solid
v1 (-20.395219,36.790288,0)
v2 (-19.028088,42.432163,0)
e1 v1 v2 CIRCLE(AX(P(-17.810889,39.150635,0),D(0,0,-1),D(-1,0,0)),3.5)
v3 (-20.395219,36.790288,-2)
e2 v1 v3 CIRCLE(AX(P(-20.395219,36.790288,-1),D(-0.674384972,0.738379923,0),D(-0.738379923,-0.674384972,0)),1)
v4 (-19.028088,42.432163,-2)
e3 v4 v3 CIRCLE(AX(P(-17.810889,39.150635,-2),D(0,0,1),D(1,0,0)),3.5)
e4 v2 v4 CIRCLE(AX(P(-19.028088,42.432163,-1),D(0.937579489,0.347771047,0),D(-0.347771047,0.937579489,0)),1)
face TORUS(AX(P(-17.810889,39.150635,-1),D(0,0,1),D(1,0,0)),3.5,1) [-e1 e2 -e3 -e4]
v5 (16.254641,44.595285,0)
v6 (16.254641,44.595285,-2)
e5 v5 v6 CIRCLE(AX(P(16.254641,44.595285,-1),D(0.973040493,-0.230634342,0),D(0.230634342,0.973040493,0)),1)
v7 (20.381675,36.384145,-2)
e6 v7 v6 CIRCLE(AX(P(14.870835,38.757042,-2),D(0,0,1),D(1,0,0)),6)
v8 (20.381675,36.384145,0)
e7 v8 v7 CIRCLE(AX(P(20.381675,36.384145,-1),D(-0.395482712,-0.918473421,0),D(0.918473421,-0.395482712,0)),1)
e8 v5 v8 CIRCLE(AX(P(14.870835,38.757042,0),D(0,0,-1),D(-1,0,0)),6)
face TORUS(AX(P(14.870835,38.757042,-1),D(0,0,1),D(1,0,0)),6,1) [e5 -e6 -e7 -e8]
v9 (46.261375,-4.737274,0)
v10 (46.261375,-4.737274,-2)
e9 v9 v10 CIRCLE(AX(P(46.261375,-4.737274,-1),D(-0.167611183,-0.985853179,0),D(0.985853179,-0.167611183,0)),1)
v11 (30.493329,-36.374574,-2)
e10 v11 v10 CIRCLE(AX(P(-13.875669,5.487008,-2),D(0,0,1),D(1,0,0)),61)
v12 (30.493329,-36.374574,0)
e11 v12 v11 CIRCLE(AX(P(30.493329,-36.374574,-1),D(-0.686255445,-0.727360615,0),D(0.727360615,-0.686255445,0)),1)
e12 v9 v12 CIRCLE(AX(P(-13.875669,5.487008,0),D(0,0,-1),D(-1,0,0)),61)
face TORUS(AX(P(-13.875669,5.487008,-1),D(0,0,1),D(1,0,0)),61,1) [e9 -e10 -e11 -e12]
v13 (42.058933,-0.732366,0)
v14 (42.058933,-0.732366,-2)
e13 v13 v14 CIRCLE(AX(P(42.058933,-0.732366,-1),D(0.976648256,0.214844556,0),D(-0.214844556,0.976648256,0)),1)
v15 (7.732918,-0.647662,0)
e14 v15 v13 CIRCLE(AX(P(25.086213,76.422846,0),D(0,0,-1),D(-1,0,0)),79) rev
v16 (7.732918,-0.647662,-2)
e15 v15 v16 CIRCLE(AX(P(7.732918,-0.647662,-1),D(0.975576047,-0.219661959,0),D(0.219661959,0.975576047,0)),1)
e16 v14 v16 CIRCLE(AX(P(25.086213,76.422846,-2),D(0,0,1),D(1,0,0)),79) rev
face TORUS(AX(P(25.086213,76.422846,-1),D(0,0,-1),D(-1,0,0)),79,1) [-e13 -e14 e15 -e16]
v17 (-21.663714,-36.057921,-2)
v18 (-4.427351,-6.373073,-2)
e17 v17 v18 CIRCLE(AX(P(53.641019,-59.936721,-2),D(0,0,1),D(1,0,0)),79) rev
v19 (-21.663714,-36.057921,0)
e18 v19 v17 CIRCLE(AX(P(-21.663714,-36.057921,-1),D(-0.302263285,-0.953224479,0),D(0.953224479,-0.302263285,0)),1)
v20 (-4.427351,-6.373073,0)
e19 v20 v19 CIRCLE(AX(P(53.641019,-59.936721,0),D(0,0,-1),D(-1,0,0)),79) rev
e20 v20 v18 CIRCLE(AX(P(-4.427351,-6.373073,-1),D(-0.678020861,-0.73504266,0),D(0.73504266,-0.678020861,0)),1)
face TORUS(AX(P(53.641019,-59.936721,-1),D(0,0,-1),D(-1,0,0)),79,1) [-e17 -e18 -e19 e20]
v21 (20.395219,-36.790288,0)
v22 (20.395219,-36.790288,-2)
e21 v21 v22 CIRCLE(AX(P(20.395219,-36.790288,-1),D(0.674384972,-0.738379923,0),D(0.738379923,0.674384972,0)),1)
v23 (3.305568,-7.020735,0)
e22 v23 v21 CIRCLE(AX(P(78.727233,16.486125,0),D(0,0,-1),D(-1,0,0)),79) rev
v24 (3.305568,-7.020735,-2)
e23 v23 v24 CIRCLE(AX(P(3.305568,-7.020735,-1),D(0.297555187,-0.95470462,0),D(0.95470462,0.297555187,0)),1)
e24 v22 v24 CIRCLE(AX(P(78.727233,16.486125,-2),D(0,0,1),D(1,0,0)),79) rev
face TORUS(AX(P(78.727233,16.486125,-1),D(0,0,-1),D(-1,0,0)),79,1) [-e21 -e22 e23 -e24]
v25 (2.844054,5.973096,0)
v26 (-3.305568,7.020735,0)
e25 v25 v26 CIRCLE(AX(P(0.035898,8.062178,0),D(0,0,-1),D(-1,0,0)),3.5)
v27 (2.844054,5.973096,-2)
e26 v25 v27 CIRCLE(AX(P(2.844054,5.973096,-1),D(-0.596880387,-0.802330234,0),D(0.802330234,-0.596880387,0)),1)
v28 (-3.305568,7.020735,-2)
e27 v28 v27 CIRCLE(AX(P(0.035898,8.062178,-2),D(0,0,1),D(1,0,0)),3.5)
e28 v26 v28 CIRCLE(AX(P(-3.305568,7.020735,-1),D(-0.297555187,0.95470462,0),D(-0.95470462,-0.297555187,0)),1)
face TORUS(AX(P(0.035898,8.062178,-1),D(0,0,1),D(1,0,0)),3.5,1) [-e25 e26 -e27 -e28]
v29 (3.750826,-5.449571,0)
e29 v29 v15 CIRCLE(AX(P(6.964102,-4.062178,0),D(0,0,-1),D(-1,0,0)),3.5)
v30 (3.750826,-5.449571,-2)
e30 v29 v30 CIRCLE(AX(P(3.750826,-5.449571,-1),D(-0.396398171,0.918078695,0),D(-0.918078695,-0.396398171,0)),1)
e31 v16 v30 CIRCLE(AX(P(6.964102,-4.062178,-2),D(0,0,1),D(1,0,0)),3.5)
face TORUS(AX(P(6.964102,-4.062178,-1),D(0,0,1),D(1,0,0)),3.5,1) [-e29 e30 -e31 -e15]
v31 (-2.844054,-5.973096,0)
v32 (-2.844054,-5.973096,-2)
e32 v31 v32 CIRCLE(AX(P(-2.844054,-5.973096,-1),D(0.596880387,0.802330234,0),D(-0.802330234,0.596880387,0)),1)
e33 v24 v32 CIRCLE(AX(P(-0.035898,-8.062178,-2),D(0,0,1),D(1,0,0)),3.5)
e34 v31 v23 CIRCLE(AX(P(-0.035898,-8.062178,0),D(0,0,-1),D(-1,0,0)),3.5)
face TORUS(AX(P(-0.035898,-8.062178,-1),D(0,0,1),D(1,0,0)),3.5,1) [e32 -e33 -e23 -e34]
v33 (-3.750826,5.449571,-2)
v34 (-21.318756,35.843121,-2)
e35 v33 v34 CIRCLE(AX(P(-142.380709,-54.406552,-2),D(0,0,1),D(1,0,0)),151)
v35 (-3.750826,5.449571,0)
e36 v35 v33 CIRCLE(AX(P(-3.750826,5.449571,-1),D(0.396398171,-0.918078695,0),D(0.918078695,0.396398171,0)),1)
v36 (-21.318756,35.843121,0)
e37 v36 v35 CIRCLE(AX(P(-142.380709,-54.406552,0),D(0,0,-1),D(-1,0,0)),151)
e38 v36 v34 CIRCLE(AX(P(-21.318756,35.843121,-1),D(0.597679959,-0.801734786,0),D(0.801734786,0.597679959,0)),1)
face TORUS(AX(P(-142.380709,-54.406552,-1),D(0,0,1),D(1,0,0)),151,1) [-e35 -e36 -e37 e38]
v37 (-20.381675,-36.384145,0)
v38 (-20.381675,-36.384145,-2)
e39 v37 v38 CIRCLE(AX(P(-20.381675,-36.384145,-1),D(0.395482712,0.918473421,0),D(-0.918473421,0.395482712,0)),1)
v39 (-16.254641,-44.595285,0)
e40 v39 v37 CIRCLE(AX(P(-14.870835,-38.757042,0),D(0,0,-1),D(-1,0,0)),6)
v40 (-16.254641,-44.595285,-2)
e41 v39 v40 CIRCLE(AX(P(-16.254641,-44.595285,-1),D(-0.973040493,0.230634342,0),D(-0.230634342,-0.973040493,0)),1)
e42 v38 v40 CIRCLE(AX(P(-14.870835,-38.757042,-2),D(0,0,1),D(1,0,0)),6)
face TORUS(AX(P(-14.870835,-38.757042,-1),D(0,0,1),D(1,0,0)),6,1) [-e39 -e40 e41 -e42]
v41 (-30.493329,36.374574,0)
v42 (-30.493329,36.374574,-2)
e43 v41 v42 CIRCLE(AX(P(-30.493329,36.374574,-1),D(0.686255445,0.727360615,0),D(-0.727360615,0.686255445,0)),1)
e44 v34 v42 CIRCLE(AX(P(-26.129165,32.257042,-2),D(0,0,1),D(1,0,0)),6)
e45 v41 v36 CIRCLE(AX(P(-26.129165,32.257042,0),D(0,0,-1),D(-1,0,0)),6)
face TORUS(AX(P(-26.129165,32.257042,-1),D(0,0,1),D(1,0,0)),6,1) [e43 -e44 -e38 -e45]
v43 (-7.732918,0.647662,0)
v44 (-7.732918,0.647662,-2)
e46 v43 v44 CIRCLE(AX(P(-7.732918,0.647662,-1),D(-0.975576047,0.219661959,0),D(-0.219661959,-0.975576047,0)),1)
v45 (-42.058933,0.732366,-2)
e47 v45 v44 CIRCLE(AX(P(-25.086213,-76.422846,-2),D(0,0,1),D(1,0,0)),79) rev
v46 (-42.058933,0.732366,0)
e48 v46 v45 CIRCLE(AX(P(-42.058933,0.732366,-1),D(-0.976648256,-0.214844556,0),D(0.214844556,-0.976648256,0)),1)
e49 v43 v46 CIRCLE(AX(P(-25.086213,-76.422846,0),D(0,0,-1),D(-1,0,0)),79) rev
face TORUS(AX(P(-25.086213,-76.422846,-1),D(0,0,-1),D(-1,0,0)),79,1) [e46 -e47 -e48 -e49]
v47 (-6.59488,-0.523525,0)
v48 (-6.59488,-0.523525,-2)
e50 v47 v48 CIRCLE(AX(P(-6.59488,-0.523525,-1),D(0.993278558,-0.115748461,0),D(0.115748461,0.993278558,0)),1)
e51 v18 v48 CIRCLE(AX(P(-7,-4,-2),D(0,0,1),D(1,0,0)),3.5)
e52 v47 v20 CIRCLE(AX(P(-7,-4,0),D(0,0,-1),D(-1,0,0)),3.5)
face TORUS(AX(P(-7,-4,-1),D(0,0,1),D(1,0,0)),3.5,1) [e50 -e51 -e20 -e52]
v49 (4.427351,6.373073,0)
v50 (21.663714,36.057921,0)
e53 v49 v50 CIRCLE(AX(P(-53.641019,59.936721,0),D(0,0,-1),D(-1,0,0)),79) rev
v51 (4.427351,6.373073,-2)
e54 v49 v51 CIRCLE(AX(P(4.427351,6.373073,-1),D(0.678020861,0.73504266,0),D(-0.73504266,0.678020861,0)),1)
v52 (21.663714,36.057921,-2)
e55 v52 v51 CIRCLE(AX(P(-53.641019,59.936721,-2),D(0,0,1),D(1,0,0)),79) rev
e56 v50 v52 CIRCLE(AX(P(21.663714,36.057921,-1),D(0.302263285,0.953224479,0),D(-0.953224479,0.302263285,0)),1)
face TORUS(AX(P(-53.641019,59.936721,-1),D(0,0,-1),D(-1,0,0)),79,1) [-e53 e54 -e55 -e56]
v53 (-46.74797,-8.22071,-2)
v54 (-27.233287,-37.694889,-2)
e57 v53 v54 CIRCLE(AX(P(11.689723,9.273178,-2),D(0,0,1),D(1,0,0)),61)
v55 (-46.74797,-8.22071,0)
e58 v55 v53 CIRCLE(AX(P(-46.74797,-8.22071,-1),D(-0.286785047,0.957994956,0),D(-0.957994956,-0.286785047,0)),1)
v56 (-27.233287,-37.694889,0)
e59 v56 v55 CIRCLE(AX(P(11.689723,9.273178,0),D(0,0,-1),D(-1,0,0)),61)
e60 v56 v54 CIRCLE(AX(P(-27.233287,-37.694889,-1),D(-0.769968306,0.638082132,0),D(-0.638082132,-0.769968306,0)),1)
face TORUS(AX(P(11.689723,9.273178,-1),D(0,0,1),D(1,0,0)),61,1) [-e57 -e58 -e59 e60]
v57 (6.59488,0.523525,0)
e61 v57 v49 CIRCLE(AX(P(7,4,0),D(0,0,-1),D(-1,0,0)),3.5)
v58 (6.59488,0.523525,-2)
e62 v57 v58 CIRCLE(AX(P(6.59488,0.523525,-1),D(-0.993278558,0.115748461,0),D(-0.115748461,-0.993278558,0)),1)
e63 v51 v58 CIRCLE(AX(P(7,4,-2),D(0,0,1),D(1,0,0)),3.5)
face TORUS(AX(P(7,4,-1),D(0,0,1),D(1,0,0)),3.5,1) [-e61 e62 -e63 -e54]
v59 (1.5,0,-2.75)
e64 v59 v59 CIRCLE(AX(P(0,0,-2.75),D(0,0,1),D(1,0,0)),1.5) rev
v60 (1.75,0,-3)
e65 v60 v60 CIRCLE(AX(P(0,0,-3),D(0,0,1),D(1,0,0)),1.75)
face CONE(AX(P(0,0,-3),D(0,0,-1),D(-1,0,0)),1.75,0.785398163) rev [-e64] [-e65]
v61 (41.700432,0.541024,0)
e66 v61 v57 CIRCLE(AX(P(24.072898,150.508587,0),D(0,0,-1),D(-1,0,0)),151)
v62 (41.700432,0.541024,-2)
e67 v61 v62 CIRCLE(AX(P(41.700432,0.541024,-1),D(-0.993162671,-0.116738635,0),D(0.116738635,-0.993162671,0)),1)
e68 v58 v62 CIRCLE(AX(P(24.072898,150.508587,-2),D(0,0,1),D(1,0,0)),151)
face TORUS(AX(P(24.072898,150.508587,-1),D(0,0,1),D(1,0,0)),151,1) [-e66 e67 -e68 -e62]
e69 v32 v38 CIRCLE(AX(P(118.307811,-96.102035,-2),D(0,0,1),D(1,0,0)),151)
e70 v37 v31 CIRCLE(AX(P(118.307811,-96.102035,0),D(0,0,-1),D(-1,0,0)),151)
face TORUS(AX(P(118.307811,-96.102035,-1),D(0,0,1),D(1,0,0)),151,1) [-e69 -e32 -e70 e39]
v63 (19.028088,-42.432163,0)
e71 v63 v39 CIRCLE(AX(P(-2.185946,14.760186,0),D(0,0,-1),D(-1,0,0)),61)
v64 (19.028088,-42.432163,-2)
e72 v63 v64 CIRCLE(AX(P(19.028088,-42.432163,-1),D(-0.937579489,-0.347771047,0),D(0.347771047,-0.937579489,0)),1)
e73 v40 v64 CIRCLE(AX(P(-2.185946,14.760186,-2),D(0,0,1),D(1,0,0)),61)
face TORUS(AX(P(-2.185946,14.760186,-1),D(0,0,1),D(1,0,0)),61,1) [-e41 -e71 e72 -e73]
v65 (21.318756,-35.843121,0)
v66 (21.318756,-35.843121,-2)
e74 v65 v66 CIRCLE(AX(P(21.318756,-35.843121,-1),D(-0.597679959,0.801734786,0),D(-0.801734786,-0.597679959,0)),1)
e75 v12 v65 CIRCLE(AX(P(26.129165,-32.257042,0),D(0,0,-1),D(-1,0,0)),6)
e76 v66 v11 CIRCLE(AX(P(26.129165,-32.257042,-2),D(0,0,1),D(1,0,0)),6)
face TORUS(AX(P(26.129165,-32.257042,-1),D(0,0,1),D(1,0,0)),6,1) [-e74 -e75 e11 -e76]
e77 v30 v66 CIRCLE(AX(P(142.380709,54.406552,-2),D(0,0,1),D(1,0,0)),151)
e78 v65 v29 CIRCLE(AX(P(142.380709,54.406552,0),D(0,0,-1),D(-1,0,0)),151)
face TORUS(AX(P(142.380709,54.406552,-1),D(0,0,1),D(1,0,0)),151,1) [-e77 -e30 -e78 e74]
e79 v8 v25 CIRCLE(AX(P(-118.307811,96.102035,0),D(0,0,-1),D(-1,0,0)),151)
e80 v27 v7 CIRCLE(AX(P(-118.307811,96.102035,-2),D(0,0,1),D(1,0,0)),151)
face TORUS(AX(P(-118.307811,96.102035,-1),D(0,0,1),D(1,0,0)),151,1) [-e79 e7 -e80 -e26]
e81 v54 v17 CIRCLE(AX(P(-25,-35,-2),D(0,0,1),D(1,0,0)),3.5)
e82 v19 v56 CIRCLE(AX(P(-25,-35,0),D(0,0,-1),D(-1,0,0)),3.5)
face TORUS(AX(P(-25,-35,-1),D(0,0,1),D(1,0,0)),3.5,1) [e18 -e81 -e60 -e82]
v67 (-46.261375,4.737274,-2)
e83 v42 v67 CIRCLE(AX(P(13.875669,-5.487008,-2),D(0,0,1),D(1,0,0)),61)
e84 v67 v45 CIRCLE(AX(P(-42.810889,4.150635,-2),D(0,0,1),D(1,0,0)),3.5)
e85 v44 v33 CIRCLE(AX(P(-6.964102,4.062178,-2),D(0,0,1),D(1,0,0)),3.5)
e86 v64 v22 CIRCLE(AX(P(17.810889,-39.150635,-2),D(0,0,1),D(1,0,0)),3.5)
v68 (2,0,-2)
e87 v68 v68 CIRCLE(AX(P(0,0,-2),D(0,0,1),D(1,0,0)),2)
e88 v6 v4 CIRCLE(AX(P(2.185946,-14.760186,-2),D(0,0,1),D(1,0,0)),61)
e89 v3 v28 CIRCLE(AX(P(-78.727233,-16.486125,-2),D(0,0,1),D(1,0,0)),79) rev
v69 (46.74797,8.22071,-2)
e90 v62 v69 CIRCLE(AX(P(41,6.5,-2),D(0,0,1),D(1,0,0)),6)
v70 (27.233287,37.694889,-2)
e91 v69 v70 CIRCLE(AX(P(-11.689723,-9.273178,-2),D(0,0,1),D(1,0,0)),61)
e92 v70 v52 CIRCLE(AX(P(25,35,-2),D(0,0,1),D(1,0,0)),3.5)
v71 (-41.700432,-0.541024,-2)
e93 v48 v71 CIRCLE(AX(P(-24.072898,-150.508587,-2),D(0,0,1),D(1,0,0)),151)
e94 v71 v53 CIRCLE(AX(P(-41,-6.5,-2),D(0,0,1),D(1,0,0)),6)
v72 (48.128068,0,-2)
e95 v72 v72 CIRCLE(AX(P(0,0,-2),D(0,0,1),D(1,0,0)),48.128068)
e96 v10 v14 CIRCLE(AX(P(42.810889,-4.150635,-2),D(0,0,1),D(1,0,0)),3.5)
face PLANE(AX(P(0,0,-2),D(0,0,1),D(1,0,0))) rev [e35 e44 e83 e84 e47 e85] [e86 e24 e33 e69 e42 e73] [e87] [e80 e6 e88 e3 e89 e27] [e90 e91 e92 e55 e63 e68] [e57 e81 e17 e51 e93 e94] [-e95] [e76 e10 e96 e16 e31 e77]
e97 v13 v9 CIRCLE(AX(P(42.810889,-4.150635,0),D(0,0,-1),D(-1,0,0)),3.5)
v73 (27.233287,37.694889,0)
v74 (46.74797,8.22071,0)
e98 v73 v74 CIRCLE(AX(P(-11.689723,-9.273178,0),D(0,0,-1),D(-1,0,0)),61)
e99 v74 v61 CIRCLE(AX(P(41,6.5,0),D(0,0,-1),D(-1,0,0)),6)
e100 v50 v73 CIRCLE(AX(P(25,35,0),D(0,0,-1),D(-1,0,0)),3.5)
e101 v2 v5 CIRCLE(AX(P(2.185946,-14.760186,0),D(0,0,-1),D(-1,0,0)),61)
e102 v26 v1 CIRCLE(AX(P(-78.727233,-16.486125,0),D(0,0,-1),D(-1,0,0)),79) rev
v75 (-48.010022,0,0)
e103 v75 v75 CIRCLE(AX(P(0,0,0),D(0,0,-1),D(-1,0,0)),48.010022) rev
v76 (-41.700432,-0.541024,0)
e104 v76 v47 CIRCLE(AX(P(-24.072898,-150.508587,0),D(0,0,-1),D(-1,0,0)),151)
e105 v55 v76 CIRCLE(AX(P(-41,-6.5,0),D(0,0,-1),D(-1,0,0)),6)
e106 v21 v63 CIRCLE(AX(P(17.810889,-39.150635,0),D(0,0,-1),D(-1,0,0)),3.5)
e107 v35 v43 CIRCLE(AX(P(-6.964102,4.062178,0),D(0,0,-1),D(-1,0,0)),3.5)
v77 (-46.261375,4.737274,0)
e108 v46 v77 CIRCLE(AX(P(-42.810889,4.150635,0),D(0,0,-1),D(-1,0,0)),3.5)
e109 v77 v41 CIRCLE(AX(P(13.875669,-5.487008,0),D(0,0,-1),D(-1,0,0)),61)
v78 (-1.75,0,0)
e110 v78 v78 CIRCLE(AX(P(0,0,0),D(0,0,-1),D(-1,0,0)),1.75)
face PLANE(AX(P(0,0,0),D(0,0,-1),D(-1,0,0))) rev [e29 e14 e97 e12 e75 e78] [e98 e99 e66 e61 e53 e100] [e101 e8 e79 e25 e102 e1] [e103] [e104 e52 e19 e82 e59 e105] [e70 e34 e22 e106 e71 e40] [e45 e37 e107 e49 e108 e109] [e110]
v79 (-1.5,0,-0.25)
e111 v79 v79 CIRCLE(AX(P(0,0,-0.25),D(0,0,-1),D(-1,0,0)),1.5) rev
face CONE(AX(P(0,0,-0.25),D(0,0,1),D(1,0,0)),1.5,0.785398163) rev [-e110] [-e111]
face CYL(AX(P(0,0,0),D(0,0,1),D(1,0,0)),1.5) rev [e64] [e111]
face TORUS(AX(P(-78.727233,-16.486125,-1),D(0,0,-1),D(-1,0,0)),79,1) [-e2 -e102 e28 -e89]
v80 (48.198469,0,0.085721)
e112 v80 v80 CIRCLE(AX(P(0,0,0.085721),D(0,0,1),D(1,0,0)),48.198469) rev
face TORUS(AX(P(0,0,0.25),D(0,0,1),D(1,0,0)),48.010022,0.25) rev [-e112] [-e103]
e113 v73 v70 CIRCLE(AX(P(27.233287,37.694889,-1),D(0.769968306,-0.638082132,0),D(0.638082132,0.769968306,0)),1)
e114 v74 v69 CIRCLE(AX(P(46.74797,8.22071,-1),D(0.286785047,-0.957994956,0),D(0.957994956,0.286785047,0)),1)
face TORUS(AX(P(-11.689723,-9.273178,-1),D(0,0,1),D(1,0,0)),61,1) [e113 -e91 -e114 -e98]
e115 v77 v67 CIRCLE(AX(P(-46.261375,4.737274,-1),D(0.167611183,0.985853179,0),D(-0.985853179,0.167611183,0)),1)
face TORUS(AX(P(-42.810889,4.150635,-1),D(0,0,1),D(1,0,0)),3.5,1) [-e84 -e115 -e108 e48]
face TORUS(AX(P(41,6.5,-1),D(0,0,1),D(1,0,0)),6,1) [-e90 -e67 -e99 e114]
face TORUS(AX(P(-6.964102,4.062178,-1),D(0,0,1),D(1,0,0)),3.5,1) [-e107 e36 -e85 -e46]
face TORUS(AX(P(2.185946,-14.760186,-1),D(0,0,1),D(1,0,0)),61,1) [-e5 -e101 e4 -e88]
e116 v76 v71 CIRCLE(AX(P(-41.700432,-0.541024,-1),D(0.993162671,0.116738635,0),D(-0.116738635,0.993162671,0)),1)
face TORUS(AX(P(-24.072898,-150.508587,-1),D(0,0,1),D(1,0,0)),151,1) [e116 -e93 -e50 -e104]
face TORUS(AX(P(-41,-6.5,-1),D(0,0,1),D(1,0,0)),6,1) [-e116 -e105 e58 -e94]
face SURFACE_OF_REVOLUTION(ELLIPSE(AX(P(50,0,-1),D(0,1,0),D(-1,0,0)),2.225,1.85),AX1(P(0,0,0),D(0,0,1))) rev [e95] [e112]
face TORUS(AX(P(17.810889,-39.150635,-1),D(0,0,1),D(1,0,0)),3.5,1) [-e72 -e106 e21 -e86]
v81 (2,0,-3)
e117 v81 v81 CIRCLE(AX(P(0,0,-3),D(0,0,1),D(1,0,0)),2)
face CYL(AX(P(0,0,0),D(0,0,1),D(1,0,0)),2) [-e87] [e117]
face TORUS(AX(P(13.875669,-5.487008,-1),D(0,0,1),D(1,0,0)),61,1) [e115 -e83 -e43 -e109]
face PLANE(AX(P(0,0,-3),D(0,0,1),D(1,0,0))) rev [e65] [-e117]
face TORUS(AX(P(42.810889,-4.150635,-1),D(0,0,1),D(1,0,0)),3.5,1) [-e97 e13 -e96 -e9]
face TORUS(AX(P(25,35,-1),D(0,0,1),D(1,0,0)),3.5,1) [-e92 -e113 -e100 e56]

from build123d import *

# Parameters (mm, degrees)
CUT_EXTRUDE1_DEPTH       = 74.918206627
FILLET1_R                = 1
FILLET2_R                = 0.25
CHAMFER1_SIZE            = 0.25
CIRPATTERN2_COUNT        = 6
FILLET1_OF_CIRPATTERN2_R = 1


with BuildPart() as part:
    # Sketch1 → Revolve1 (revolve)
    with BuildSketch(Plane(origin=(0, 0, 0), x_dir=(1, 0, 0), z_dir=(0, 1, 0))):
        with BuildLine():
            Line((1.5, 3), (1.5, 0))
            Line((1.5, 0), (48.12806752, 0))
            add(Edge.make_bspline(
                [(48.12806752, 0), (52.225, -5.301910747), (52.225, 1), (52.225, 7.301910747), (48.12806752, 2)],
                knots=[0.571079469, 0.571079469, 0.571079469, 3.141592654, 3.141592654, 5.712105838, 5.712105838, 5.712105838], degree=2, weights=[1, 0.281675373, 1, 0.281675373, 1]))
            Line((48.12806752, 2), (2, 2))
            Line((2, 2), (2, 3))
            Line((2, 3), (1.5, 3))
        make_face()
    revolve(axis=Axis((0, 0, 0), (0, 0, -1)))

    # Sketch2 → Cut-Extrude1 (cut, through all)
    with BuildSketch(Plane.XY):
        with BuildLine():
            ThreePointArc((6.710628848, 1.516803605), (24.147667895, 0.50860594), (41.583693173, 1.534186645))
            ThreePointArc((41.583693173, 1.534186645), (45.178305917, 3.753773559), (45.789974782, 7.933925237))
            ThreePointArc((45.789974782, 7.933925237), (38.338622573, 23.850298643), (26.595205331, 36.924920765))
            ThreePointArc((26.595205331, 36.924920765), (24.295036919, 37.398546863), (22.616938803, 35.755658212))
            ThreePointArc((22.616938803, 35.755658212), (15.542096241, 19.765879602), (5.162393349, 5.695052151))
            ThreePointArc((5.162393349, 5.695052151), (4.655762624, 3.131350976), (6.710628848, 1.516803605))
        make_face()
    cut_extrude1 = extrude(amount=-CUT_EXTRUDE1_DEPTH, mode=Mode.SUBTRACT)

    # Fillet1
    fillet1_edges = [part.edges().sort_by_distance(p)[0] for p in [
        (24.147667895, 0.50860594, -2),
        (45.178305917, 3.753773559, -2),
        (38.338622573, 23.850298643, -2),
        (24.295036919, 37.398546863, -2),
        (15.542096241, 19.765879602, -2),
        (4.655762624, 3.131350976, -2),
        (6.710628848, 1.516803605, -1),
        (5.162393349, 5.695052151, -1),
        (22.616938803, 35.755658212, -1),
        (26.595205331, 36.924920765, -1),
        (45.789974782, 7.933925237, -1),
        (41.583693173, 1.534186645, -1),
        (4.655762624, 3.131350976, 0),
        (24.147667895, 0.50860594, 0),
        (45.178305917, 3.753773559, 0),
        (38.338622573, 23.850298643, 0),
        (24.295036919, 37.398546863, 0),
        (15.542096241, 19.765879602, 0),
    ]]
    fillet(fillet1_edges, radius=FILLET1_R - 0.0001)  # a hair under: the kernel refuses the full size

    # Fillet2
    fillet2_edges = [part.edges().sort_by_distance(p)[0] for p in [
        (-48.12806752, 0, 0),
    ]]
    fillet(fillet2_edges, radius=FILLET2_R)

    # Chamfer1
    chamfer1_edges = [part.edges().sort_by_distance(p)[0] for p in [
        (-1.5, 0, 0),
        (-1.5, 0, -3),
    ]]
    chamfer(chamfer1_edges, length=CHAMFER1_SIZE)

    # CirPattern2: Cut-Extrude1 ×6 about axis
    cirpattern2_axis = Axis((0, 0, 0), (0, 0, -1))
    for i in range(1, CIRPATTERN2_COUNT):
        add(cut_extrude1.rotate(cirpattern2_axis, i * 360 / CIRPATTERN2_COUNT), mode=Mode.SUBTRACT)

    # Fillet1 of CirPattern2
    fillet1_of_cirpattern2_edges = [part.edges().sort_by_distance(p)[0] for p in [
        (12.514299612, -20.658190869, -2),
        (25.84001622, -37.248673844, -2),
        (39.824275799, -21.277071773, -2),
        (44.535610107, -2.340845726, -2),
        (24.888801984, -3.576910372, -2),
        (5.039710806, -2.466333219, -2),
        (4.668904878, -5.053173255, -1),
        (7.513256513, -1.623237709, -1),
        (42.273777742, -1.709014454, -1),
        (45.275522081, -4.569663053, -1),
        (29.765968198, -35.688318782, -1),
        (22.120491195, -35.245441348, -1),
        (5.039710806, -2.466333219, 0),
        (12.514299612, -20.658190869, 0),
        (25.84001622, -37.248673844, 0),
        (39.824275799, -21.277071773, 0),
        (44.535610107, -2.340845726, 0),
        (24.888801984, -3.576910372, 0),
        (-11.633368283, -21.166796809, -2),
        (-19.338289696, -41.002447403, -2),
        (1.485653226, -45.127370416, -2),
        (20.240573189, -39.739392589, -2),
        (9.346705743, -23.342789974, -2),
        (0.383948181, -5.597684195, -2),
        (-2.041723969, -6.56997686, -1),
        (2.350863164, -7.31828986, -1),
        (19.656838939, -37.464672666, -1),
        (18.68031675, -41.494583818, -1),
        (-16.024006584, -43.622244019, -1),
        (-19.463201978, -36.779627993, -1),
        (0.383948181, -5.597684195, 0),
        (-11.633368283, -21.166796809, 0),
        (-19.338289696, -41.002447403, 0),
        (1.485653226, -45.127370416, 0),
        (20.240573189, -39.739392589, 0),
        (9.346705743, -23.342789974, 0),
        (-24.147667895, -0.50860594, -2),
        (-45.178305917, -3.753773559, -2),
        (-38.338622573, -23.850298643, -2),
        (-24.295036919, -37.398546863, -2),
        (-15.542096241, -19.765879602, -2),
        (-4.655762624, -3.131350976, -2),
        (-6.710628848, -1.516803605, -1),
        (-5.162393349, -5.695052151, -1),
        (-22.616938803, -35.755658212, -1),
        (-26.595205331, -36.924920765, -1),
        (-45.789974782, -7.933925237, -1),
        (-41.583693173, -1.534186645, -1),
        (-4.655762624, -3.131350976, 0),
        (-24.147667895, -0.50860594, 0),
        (-45.178305917, -3.753773559, 0),
        (-38.338622573, -23.850298643, 0),
        (-24.295036919, -37.398546863, 0),
        (-15.542096241, -19.765879602, 0),
        (-12.514299612, 20.658190869, -2),
        (-25.84001622, 37.248673844, -2),
        (-39.824275799, 21.277071773, -2),
        (-44.535610107, 2.340845726, -2),
        (-24.888801984, 3.576910372, -2),
        (-5.039710806, 2.466333219, -2),
        (-4.668904878, 5.053173255, -1),
        (-7.513256513, 1.623237709, -1),
        (-42.273777742, 1.709014454, -1),
        (-45.275522081, 4.569663053, -1),
        (-29.765968198, 35.688318782, -1),
        (-22.120491195, 35.245441348, -1),
        (-5.039710806, 2.466333219, 0),
        (-12.514299612, 20.658190869, 0),
        (-25.84001622, 37.248673844, 0),
        (-39.824275799, 21.277071773, 0),
        (-44.535610107, 2.340845726, 0),
        (-24.888801984, 3.576910372, 0),
        (11.633368283, 21.166796809, -2),
        (19.338289696, 41.002447403, -2),
        (-1.485653226, 45.127370416, -2),
        (-20.240573189, 39.739392589, -2),
        (-9.346705743, 23.342789974, -2),
        (-0.383948181, 5.597684195, -2),
        (2.041723969, 6.56997686, -1),
        (-2.350863164, 7.31828986, -1),
        (-19.656838939, 37.464672666, -1),
        (-18.68031675, 41.494583818, -1),
        (16.024006584, 43.622244019, -1),
        (19.463201978, 36.779627993, -1),
        (-0.383948181, 5.597684195, 0),
        (11.633368283, 21.166796809, 0),
        (19.338289696, 41.002447403, 0),
        (-1.485653226, 45.127370416, 0),
        (-20.240573189, 39.739392589, 0),
        (-9.346705743, 23.342789974, 0),
    ]]
    fillet(fillet1_of_cirpattern2_edges, radius=FILLET1_OF_CIRPATTERN2_R - 0.0001)  # a hair under: the kernel refuses the full size


solid = part.part
